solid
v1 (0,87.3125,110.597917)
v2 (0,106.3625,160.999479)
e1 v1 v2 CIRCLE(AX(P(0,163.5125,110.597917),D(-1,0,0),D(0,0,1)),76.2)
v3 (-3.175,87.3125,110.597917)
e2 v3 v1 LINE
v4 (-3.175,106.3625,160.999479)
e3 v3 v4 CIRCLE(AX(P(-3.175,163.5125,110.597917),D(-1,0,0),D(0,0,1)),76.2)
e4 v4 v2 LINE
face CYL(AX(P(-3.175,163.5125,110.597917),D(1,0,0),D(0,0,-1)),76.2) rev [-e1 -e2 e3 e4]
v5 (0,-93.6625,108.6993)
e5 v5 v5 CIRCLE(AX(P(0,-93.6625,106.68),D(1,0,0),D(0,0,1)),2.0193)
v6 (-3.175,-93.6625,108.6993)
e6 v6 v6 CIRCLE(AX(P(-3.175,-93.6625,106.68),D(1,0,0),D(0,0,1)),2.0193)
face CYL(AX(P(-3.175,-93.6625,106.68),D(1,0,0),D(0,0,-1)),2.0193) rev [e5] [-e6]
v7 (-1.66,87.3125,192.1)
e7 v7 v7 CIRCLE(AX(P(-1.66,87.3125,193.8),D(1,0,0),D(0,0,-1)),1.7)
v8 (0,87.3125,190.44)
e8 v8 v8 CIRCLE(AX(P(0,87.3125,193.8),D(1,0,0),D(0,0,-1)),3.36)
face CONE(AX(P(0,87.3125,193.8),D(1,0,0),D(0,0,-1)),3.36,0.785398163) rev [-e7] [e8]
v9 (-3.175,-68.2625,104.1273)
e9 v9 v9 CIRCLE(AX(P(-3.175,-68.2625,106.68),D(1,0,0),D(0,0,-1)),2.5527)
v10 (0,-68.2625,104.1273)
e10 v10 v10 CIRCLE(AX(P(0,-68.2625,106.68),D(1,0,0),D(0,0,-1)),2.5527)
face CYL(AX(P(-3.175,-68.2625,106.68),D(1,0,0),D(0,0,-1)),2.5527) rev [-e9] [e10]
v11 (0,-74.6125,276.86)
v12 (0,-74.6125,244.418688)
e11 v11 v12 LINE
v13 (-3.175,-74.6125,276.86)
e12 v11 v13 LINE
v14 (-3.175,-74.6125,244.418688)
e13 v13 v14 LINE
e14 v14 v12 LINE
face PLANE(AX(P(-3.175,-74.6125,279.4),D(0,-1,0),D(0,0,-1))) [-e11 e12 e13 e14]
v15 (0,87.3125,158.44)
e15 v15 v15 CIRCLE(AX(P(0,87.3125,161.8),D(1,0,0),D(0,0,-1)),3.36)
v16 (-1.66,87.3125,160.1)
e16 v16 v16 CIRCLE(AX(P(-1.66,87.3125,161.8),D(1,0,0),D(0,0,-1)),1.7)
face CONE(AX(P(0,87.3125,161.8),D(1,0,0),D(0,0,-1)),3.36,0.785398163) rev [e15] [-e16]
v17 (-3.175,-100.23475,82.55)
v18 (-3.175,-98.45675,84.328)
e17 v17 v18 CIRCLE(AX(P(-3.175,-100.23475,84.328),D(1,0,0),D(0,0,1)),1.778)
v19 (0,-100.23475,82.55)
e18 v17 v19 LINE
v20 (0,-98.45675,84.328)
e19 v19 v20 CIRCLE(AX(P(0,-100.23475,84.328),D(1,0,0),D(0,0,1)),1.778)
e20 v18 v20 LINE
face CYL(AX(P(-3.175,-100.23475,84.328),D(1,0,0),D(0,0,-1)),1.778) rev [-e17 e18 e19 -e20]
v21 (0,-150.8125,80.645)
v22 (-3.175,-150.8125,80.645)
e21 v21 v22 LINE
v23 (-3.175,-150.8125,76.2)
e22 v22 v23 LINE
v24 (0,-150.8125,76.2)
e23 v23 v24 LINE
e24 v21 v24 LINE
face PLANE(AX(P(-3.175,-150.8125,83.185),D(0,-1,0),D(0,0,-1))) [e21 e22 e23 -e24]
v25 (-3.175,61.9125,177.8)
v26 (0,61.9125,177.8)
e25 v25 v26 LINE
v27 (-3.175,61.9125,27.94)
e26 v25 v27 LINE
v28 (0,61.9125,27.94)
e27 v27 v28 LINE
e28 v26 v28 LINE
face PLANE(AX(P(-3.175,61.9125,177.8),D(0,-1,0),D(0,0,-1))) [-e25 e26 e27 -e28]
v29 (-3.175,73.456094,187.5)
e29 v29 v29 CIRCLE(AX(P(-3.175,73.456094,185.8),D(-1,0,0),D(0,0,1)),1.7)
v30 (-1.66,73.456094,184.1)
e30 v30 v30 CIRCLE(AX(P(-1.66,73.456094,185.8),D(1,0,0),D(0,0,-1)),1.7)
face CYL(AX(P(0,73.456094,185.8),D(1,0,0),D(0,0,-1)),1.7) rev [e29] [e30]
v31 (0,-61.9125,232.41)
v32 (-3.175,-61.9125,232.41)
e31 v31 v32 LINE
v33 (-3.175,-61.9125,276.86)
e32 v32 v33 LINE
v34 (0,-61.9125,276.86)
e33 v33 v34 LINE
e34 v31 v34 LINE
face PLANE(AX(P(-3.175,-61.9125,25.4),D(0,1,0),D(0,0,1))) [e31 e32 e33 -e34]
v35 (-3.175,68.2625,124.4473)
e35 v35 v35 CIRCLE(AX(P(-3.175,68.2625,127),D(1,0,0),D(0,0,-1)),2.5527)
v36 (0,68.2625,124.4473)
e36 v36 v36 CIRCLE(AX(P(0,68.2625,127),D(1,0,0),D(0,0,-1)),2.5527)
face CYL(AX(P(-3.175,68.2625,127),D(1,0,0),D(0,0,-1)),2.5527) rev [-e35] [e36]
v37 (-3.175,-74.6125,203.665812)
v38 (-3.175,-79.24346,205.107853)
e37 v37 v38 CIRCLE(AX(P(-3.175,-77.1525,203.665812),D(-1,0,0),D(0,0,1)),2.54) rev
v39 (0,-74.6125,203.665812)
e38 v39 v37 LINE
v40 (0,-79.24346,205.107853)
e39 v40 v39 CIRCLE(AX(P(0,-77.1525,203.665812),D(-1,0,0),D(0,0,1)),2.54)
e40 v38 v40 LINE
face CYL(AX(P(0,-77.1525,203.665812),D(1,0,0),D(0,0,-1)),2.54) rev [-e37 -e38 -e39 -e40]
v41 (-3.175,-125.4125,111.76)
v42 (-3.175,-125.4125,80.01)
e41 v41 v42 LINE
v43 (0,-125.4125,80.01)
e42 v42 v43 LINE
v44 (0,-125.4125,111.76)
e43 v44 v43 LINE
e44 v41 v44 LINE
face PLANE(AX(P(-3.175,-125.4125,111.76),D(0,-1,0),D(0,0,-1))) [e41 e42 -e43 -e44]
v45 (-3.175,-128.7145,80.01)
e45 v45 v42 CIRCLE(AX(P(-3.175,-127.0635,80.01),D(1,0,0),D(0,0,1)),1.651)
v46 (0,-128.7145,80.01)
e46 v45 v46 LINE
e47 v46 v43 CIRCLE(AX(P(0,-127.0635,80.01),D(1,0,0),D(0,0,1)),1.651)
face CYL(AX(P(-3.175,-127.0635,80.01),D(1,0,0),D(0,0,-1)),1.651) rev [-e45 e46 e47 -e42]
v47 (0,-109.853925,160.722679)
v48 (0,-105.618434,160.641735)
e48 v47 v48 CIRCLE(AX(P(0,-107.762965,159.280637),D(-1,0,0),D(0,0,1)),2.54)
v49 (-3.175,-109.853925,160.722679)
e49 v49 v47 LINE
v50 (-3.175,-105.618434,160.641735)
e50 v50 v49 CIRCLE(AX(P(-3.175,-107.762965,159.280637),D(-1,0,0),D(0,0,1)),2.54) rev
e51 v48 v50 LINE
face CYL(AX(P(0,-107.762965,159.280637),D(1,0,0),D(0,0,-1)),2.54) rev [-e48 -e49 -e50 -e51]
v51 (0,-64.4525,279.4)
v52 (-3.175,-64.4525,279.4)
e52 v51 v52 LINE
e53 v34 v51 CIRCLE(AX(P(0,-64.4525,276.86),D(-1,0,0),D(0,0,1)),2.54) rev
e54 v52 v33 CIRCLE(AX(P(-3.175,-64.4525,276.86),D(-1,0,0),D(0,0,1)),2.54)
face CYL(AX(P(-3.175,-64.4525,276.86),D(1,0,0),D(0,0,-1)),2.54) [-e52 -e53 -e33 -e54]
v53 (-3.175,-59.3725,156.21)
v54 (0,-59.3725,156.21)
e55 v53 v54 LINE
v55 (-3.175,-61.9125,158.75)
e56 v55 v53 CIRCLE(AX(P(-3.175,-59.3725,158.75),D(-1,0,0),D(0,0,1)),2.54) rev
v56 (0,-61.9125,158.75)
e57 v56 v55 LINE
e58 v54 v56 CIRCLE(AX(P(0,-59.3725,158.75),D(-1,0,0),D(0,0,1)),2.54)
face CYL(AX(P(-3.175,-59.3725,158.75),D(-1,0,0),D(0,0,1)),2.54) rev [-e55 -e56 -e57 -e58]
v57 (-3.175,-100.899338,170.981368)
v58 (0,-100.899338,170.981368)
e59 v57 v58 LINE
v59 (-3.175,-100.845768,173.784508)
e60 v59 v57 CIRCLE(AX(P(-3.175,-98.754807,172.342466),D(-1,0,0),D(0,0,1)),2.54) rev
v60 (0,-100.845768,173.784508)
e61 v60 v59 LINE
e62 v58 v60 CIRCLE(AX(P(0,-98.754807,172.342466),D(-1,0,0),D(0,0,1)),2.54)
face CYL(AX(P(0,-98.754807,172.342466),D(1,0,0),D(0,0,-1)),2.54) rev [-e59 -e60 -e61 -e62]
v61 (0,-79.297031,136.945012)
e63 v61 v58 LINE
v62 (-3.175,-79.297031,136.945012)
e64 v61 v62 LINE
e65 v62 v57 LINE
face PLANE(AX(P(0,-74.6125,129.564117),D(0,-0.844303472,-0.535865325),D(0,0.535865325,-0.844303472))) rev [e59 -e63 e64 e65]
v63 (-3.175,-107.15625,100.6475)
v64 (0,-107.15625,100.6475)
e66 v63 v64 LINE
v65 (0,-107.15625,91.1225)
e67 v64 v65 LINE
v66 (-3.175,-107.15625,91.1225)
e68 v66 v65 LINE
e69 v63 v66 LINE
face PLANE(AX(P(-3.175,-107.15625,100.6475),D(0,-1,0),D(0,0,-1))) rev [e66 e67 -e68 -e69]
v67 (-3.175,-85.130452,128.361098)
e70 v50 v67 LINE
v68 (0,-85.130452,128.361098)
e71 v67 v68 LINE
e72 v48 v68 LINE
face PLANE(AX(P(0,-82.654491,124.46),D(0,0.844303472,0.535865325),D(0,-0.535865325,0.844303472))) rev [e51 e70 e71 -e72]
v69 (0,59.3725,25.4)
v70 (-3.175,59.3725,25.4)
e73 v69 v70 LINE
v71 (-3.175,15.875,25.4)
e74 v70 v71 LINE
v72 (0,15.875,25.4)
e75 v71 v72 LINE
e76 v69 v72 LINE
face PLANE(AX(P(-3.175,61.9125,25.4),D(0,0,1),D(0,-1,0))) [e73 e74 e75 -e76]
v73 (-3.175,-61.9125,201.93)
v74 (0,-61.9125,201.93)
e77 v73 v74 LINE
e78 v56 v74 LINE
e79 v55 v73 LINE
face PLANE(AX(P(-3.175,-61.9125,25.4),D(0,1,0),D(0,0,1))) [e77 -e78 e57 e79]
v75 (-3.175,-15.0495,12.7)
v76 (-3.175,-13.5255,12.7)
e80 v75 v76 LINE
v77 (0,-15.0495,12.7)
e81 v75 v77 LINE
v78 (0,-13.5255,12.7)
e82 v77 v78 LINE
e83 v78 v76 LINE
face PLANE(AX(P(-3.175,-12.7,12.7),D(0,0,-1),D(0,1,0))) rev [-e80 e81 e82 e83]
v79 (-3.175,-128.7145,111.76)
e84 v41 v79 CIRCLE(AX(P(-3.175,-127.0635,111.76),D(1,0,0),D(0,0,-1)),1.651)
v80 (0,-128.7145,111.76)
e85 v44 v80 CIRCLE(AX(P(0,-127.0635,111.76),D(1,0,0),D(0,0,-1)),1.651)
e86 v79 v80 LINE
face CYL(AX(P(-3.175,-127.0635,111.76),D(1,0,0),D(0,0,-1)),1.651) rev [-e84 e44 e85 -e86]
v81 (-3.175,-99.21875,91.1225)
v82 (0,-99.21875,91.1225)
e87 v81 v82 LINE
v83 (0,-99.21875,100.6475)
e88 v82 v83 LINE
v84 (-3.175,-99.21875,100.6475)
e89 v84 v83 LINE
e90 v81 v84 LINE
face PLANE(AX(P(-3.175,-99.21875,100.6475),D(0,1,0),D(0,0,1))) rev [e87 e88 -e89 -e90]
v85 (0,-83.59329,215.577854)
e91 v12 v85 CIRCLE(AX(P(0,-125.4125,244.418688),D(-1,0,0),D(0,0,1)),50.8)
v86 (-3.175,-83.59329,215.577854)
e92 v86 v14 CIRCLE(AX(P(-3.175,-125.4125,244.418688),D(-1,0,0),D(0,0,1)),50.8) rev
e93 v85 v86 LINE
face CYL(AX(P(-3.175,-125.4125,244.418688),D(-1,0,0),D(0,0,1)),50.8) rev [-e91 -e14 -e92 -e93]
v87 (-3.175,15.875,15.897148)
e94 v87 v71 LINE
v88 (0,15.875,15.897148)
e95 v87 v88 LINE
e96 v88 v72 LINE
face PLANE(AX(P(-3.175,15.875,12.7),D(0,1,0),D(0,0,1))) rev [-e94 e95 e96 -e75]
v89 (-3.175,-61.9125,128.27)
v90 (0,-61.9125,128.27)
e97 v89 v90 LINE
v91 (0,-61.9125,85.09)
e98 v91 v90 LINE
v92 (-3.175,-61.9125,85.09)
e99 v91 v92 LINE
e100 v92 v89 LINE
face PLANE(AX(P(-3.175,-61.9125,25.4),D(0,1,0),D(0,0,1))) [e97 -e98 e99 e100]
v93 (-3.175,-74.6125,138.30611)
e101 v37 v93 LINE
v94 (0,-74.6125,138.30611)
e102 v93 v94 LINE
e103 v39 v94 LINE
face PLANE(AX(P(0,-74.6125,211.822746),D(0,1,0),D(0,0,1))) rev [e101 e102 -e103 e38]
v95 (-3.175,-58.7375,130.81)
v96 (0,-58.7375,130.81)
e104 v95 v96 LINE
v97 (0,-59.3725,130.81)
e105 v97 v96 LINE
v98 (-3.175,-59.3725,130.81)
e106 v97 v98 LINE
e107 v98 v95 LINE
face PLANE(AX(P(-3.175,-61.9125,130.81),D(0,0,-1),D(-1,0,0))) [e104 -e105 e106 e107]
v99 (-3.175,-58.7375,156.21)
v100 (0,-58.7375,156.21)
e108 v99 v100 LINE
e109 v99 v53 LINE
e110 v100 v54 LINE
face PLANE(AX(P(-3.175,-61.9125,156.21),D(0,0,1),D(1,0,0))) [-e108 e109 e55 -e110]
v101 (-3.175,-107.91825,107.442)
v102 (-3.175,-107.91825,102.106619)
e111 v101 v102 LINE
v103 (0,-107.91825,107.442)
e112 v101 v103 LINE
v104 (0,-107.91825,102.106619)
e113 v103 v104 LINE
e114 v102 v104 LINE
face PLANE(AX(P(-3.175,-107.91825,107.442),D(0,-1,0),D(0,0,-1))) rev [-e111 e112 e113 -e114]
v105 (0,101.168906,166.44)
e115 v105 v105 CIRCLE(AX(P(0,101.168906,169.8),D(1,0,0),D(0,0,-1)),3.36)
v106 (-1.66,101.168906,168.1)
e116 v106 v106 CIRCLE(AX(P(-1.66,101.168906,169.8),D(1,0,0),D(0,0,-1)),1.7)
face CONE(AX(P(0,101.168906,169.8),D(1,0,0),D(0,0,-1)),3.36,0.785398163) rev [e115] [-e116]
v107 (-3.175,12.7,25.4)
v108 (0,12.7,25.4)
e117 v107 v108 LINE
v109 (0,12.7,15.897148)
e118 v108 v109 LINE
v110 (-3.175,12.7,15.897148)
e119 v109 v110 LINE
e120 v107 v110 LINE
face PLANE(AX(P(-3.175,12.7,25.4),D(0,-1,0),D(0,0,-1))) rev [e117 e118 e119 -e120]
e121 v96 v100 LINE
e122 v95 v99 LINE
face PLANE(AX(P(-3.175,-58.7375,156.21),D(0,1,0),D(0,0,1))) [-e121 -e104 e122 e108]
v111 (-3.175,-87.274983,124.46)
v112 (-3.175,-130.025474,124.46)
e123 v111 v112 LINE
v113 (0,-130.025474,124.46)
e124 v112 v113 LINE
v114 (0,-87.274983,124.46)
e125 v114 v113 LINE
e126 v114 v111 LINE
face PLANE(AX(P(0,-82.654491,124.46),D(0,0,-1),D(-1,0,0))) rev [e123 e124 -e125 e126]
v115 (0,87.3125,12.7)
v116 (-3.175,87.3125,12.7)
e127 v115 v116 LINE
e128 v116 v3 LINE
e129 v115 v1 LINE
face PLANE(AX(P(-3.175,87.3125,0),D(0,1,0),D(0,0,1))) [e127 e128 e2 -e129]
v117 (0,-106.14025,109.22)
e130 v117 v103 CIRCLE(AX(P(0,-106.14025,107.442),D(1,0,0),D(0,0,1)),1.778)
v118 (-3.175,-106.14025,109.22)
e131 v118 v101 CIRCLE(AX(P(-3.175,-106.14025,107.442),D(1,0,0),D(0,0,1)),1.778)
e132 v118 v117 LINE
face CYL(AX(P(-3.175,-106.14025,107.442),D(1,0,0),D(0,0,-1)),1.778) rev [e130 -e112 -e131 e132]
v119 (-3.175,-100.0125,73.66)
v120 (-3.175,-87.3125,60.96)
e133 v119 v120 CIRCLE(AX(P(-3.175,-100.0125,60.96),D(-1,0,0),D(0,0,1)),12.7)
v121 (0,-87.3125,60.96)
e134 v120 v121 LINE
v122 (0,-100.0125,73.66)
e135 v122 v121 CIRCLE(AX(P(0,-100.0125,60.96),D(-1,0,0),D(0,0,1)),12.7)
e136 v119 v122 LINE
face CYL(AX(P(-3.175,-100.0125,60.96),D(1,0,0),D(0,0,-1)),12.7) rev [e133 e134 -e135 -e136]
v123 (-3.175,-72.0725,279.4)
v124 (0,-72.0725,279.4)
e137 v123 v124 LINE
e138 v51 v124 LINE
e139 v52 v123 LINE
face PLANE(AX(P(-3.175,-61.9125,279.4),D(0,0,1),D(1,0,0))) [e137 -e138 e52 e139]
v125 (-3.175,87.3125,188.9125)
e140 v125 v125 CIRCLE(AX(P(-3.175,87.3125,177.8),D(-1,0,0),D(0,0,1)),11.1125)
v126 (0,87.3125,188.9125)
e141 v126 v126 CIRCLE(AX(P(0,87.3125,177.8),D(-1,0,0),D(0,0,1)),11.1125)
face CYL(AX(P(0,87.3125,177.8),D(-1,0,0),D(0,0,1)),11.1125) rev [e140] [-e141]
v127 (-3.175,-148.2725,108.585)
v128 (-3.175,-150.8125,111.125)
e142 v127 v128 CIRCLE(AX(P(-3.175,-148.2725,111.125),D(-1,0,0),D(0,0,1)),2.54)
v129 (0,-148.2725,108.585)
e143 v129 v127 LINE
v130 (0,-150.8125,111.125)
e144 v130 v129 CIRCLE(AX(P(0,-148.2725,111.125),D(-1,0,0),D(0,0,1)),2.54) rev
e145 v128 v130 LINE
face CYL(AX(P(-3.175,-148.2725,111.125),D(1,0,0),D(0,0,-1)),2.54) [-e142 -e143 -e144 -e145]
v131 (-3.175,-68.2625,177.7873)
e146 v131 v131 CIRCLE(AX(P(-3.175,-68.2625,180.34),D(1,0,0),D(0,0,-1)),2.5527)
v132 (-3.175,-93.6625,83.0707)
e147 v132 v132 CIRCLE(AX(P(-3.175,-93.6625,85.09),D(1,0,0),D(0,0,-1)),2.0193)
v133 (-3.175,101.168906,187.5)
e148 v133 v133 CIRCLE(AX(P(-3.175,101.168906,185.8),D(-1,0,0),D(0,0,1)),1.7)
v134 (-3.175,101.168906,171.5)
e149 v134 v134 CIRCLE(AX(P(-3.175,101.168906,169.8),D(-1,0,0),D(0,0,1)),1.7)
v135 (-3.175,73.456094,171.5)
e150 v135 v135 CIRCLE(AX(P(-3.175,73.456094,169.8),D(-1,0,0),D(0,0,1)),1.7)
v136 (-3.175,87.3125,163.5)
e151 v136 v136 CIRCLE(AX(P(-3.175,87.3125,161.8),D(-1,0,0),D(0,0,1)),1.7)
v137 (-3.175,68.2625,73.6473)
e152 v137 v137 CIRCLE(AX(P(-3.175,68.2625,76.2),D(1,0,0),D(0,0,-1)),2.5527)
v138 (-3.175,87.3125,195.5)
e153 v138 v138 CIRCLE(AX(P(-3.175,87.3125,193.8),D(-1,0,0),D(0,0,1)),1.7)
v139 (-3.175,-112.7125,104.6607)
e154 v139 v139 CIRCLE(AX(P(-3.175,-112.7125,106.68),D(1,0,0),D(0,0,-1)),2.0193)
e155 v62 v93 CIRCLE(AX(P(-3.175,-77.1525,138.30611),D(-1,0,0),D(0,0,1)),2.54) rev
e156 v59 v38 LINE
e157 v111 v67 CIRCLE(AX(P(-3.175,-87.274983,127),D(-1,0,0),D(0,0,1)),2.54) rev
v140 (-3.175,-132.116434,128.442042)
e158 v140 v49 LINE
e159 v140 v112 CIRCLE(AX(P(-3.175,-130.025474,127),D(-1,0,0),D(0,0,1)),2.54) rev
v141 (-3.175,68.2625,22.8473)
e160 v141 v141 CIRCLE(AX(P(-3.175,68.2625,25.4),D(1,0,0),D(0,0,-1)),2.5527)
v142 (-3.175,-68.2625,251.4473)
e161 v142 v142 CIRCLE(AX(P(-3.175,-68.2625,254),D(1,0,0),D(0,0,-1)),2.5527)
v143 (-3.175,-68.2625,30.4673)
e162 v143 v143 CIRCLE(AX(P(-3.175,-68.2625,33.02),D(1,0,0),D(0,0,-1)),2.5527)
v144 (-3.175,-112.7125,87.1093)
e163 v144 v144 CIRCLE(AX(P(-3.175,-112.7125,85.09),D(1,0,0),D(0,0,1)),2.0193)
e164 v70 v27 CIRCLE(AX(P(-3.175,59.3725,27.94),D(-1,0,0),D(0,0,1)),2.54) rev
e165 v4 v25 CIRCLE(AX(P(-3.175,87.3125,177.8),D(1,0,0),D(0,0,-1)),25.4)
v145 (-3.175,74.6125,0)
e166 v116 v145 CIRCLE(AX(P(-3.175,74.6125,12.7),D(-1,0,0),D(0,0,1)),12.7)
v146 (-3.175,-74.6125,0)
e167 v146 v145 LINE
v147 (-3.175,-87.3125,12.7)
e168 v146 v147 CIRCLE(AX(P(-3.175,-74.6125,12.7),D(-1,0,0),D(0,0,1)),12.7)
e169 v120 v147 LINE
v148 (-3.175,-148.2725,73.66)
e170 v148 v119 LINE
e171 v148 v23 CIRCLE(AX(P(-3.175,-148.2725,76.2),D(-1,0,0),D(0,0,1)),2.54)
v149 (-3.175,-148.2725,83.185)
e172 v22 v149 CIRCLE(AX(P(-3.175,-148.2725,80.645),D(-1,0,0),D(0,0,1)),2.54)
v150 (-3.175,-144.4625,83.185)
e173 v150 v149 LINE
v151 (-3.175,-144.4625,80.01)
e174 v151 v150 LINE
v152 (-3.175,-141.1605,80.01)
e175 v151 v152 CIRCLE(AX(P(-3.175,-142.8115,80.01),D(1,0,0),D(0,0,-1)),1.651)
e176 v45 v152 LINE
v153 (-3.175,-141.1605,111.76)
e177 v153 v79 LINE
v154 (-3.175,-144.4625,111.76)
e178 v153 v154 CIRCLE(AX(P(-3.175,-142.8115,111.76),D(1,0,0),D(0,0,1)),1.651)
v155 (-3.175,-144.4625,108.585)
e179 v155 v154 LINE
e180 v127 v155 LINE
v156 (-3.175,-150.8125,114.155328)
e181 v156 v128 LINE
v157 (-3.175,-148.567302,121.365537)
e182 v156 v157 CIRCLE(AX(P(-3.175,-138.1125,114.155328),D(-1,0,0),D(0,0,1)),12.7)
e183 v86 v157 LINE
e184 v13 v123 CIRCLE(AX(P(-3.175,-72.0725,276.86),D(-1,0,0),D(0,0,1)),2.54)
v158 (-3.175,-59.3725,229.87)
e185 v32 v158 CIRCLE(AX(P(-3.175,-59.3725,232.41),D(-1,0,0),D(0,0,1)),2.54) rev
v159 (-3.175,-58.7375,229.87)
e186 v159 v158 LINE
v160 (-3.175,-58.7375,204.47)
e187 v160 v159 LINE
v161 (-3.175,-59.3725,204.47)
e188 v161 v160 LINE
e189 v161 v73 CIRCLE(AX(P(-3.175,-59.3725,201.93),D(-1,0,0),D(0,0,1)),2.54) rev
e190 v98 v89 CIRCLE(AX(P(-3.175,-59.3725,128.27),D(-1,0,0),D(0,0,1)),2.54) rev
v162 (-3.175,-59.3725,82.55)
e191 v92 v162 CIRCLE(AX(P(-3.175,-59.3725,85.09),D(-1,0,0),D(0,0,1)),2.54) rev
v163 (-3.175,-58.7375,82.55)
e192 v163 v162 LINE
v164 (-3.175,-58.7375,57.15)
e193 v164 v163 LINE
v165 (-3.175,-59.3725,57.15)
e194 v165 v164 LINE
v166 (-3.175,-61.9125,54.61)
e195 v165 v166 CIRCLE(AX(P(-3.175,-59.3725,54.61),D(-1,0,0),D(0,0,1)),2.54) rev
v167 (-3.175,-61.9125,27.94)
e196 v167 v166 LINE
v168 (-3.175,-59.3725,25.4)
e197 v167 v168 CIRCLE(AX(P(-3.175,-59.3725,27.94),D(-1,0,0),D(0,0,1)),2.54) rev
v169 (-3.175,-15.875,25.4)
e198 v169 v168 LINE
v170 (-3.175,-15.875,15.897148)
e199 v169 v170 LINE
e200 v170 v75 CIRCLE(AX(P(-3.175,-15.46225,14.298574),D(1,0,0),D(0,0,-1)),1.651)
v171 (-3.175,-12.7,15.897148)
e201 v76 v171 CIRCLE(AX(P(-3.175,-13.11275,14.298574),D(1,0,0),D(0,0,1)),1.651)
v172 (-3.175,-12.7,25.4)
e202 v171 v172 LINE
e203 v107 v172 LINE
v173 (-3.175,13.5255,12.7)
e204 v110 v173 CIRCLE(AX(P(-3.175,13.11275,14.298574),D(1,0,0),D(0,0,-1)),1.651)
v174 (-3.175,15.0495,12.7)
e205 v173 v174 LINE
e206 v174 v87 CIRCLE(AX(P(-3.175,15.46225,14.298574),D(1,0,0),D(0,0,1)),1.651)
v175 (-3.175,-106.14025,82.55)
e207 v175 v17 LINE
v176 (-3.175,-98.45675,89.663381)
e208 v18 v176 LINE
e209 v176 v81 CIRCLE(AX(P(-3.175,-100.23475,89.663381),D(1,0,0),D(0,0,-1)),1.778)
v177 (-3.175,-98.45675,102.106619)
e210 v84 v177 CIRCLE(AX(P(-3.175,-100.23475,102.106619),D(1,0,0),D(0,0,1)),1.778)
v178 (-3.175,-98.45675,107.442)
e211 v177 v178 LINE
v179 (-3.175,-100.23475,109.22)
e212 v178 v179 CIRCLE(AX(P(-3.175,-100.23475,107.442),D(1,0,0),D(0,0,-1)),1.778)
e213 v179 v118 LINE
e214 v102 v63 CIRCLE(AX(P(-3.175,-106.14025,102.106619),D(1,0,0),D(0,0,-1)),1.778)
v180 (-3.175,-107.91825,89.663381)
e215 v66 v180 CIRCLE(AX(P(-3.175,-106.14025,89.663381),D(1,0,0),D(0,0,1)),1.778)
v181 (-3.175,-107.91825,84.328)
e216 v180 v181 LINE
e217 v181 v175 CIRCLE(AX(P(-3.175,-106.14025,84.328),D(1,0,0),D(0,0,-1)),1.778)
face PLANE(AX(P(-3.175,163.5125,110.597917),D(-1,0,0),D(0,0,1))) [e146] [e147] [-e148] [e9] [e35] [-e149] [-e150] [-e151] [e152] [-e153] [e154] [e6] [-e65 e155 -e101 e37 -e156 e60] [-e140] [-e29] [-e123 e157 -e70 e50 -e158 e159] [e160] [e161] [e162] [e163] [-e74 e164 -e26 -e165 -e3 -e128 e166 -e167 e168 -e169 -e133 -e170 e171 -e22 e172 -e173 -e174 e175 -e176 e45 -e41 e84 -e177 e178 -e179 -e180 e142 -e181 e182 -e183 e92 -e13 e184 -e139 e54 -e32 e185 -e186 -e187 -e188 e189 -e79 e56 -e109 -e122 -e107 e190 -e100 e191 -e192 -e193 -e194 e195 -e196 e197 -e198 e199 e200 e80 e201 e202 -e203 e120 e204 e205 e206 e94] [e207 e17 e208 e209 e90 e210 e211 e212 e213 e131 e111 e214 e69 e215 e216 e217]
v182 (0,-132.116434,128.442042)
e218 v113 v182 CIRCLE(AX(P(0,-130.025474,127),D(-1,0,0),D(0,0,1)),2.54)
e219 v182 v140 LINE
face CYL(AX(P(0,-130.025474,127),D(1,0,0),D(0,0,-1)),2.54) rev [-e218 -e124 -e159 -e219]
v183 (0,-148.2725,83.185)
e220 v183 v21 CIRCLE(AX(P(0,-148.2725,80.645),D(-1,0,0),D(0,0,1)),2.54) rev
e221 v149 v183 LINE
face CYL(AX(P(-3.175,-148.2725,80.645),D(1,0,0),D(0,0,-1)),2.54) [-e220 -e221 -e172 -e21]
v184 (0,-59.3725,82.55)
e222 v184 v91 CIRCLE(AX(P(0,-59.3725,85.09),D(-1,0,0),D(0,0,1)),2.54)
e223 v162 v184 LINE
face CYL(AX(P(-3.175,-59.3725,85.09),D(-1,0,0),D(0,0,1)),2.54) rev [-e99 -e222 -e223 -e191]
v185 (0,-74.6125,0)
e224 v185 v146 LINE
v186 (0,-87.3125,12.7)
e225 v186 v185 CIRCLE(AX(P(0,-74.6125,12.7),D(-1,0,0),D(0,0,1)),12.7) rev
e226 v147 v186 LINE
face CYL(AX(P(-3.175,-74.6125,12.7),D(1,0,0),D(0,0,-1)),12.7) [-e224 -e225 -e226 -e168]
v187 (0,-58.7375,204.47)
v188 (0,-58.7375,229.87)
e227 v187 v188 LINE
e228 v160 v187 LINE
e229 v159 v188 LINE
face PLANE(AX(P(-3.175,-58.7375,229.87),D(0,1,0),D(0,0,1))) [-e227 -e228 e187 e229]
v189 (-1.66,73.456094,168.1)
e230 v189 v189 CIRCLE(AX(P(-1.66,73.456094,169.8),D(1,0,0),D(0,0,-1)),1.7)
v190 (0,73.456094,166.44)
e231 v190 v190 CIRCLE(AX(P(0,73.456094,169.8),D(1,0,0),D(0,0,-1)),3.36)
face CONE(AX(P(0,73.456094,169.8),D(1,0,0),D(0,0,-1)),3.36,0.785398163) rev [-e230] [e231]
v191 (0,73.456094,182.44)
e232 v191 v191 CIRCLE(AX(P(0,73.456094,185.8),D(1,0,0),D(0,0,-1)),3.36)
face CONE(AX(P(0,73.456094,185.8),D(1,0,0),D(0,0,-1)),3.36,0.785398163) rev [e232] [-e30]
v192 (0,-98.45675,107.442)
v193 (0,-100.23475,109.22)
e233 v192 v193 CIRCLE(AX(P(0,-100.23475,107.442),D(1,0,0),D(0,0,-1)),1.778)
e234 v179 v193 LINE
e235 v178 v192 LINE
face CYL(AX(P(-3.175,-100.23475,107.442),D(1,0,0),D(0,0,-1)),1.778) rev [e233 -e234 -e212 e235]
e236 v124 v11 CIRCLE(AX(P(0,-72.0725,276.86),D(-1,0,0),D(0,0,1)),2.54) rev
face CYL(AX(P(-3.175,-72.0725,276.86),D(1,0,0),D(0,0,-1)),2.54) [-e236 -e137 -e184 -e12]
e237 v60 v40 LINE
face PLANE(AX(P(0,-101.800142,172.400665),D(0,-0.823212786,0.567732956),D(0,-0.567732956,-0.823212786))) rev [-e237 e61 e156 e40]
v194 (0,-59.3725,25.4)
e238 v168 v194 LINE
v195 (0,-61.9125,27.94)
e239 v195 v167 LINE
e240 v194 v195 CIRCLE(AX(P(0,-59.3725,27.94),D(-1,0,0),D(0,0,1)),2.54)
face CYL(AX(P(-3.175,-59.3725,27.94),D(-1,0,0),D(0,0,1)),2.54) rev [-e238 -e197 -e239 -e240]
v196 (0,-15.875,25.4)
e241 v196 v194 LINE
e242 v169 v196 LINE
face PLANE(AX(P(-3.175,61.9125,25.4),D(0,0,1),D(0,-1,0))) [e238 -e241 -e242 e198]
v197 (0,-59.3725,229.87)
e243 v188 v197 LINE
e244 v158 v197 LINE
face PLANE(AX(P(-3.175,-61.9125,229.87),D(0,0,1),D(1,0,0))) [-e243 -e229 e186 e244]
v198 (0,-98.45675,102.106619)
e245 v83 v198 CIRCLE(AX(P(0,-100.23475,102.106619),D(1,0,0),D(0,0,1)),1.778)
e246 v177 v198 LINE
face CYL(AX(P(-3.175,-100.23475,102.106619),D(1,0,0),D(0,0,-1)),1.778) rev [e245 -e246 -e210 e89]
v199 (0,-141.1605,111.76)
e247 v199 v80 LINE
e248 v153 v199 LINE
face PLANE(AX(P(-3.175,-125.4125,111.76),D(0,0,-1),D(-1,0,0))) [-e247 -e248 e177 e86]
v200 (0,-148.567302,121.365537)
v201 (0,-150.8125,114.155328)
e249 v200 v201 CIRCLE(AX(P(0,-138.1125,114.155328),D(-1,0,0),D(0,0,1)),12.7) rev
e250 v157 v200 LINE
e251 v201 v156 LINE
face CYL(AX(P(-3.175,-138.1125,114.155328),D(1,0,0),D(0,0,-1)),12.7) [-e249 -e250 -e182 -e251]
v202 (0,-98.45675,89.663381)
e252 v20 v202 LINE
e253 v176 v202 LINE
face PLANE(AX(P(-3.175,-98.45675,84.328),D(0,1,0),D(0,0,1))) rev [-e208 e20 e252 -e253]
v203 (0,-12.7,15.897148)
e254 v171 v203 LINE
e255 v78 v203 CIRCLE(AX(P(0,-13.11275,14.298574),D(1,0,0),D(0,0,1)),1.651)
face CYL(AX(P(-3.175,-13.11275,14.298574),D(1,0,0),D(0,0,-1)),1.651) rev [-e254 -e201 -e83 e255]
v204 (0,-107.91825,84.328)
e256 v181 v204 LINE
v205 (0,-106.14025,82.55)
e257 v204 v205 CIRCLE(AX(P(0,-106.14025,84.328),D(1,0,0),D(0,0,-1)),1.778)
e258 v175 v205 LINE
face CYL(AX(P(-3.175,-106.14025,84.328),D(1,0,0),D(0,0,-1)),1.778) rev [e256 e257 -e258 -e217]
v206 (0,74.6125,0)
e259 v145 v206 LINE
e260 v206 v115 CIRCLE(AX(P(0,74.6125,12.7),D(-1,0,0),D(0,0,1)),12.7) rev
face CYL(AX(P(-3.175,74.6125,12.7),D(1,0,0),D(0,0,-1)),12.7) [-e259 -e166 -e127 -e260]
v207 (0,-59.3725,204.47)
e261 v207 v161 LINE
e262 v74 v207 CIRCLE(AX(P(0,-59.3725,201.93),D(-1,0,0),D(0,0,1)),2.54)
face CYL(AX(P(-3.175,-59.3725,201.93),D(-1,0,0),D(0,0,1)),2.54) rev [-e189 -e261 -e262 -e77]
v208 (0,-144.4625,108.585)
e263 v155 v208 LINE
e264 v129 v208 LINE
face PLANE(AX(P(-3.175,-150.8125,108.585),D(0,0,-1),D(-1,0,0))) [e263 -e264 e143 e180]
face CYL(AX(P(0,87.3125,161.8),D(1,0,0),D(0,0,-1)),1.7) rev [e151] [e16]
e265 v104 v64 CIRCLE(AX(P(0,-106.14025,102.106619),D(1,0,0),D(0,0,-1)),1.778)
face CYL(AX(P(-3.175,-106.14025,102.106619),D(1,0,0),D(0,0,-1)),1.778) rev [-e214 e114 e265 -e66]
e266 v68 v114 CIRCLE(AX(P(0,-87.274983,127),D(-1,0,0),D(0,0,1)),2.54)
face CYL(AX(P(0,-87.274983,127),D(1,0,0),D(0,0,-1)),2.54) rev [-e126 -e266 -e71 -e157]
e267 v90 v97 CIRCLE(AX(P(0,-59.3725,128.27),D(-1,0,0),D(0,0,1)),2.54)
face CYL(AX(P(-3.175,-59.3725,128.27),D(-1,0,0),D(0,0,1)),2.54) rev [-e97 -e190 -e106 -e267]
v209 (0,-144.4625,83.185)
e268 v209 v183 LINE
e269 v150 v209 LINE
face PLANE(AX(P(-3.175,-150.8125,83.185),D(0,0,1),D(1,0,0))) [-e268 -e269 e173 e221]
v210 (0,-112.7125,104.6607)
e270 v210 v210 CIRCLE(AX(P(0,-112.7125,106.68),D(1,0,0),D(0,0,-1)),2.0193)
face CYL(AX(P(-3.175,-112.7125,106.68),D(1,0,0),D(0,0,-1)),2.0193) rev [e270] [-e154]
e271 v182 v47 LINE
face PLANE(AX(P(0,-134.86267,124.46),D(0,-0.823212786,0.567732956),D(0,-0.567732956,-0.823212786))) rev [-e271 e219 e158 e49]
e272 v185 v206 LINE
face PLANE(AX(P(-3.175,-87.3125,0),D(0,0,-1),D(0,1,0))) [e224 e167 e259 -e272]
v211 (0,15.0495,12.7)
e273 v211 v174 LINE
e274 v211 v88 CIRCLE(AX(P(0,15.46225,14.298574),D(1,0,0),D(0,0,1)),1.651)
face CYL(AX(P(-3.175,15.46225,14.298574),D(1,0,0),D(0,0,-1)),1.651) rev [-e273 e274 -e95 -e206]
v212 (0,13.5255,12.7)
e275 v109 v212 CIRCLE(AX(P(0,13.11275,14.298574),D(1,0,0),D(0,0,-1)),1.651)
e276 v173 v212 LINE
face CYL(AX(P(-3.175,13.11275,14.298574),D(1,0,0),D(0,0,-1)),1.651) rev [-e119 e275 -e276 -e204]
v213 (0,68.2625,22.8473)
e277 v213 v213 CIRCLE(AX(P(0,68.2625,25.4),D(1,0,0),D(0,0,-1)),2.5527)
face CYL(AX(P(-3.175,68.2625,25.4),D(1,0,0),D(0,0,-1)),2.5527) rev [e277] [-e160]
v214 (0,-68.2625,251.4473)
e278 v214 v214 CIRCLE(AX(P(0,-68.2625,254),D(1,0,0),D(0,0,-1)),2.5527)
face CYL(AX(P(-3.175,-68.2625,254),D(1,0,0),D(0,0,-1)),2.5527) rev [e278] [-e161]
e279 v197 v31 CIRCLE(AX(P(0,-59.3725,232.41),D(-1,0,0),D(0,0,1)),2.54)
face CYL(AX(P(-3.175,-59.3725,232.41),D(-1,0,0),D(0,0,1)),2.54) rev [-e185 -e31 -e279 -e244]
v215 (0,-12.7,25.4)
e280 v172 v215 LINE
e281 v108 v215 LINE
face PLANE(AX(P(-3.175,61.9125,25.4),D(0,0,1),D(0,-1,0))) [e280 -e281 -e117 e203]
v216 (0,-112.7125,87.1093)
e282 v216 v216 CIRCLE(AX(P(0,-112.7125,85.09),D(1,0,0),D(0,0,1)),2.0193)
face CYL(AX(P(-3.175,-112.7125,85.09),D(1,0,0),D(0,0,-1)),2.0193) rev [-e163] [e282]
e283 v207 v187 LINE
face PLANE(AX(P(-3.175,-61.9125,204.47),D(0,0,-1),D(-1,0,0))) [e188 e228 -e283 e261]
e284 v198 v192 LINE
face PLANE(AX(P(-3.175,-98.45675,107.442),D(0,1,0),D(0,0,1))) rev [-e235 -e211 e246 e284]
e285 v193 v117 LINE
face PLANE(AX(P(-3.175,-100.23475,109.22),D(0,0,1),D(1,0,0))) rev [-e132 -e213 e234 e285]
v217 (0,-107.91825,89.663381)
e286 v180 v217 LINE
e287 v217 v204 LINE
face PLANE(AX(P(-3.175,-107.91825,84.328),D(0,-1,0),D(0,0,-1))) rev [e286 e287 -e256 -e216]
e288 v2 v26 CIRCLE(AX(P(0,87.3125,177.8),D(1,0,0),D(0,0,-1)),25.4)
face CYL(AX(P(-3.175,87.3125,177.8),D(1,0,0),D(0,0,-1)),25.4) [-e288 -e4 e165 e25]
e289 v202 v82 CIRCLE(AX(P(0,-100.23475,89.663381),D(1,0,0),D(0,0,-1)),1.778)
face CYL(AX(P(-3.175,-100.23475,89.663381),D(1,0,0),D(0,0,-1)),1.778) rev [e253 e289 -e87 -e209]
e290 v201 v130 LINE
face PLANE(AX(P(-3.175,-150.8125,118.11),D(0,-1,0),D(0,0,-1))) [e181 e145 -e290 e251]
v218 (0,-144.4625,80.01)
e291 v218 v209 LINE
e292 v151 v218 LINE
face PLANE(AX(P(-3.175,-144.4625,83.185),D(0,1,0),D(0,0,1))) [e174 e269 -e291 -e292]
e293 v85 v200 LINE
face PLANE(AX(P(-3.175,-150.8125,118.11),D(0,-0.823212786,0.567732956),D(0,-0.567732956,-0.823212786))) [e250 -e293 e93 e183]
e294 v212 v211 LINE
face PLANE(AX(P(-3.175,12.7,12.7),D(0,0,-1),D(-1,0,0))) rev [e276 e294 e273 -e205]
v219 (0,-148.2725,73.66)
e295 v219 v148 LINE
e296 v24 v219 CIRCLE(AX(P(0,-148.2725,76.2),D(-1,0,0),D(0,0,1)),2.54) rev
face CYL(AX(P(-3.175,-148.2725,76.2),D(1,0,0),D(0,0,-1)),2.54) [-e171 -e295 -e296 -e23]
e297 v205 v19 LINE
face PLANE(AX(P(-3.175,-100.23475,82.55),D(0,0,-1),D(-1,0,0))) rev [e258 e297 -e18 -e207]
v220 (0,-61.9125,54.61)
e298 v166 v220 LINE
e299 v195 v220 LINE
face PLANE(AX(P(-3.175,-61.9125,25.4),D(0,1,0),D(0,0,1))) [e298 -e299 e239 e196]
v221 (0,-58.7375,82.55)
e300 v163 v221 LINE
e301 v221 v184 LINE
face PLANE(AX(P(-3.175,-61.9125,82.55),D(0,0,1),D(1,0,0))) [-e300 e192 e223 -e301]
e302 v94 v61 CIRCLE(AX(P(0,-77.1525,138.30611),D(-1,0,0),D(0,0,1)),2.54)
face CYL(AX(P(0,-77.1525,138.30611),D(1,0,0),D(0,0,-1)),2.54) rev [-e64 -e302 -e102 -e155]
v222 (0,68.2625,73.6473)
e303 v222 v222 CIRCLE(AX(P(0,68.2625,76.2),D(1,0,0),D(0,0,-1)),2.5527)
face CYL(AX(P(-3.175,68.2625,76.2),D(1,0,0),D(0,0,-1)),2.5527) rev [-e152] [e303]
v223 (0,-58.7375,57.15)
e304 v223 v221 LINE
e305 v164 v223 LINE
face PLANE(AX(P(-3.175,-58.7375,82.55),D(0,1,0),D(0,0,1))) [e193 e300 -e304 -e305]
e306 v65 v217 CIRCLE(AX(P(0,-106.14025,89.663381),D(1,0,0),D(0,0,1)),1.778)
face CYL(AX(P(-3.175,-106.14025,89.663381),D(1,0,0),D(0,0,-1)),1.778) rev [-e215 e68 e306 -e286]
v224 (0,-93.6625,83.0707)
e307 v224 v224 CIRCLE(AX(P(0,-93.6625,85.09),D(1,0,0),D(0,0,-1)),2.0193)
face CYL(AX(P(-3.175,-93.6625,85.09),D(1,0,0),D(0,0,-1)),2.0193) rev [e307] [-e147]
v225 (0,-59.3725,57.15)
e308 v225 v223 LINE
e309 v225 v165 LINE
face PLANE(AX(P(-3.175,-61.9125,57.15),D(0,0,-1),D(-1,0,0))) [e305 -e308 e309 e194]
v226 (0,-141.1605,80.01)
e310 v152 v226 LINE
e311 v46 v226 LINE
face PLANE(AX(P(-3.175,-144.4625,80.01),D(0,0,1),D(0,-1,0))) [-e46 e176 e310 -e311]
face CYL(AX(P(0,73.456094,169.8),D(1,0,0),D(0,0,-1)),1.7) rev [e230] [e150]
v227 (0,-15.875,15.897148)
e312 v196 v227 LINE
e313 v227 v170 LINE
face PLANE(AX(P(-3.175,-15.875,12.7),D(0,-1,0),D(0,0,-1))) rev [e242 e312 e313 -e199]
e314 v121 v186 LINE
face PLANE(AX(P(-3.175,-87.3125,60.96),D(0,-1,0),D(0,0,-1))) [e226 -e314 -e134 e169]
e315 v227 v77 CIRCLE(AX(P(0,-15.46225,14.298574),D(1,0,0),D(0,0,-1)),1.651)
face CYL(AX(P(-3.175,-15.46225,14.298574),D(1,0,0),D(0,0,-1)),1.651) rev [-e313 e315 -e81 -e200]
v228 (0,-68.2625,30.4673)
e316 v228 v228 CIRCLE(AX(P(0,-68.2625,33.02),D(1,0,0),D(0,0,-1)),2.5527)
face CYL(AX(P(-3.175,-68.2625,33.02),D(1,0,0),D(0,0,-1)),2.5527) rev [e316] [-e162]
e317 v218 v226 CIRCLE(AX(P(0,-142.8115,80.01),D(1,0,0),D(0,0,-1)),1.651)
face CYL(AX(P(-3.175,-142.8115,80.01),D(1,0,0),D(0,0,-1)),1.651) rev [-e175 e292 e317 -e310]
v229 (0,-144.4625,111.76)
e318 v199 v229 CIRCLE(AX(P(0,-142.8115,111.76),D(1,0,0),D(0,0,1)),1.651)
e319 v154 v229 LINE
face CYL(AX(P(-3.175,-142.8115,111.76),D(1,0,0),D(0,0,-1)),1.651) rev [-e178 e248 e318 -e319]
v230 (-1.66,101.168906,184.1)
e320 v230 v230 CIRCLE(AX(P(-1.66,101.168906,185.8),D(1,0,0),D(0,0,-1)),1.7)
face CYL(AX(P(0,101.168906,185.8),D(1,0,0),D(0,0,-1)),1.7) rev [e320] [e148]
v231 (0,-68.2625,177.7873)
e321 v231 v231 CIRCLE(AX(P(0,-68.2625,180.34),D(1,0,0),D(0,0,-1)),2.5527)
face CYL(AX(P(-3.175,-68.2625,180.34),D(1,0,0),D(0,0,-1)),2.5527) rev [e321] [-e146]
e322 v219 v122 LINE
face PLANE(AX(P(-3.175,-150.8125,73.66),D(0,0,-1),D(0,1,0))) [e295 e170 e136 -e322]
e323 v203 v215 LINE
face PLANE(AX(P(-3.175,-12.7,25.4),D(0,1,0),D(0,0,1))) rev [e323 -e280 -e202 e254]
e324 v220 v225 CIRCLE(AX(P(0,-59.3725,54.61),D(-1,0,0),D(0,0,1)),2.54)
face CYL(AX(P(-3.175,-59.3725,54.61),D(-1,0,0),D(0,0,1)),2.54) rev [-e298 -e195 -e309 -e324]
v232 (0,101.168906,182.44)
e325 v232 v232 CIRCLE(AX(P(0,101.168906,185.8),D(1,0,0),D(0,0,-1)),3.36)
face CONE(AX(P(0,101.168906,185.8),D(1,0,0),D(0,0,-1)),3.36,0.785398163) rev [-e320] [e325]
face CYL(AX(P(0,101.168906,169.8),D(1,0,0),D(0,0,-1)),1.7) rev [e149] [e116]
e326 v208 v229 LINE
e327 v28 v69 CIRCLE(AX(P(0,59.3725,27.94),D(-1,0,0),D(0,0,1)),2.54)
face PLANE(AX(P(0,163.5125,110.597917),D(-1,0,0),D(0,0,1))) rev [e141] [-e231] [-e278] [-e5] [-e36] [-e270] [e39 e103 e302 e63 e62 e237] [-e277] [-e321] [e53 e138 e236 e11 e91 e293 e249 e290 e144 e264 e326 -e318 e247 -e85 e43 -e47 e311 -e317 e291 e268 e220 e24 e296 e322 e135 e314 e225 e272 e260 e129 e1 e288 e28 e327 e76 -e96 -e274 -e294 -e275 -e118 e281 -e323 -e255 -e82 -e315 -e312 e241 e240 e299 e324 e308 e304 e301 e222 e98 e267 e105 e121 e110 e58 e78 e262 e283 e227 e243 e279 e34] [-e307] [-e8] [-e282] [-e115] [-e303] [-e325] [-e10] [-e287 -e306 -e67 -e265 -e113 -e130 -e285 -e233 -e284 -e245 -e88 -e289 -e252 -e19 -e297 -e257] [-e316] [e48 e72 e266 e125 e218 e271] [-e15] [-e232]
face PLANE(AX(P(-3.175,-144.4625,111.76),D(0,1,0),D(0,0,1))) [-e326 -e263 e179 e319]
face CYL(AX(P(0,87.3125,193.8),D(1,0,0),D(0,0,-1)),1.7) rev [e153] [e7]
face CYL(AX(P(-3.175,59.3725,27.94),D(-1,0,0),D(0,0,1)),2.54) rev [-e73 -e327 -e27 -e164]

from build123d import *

# Parameters (mm, degrees)
BASE_FLANGE1_DEPTH           = 3.175
SKETCH8_W                    = 12.7
SKETCH8_H                    = 3.175
CUT_EXTRUDE2_DEPTH           = 318.51984313
SKETCH11_R                   = 3.175
CUT_EXTRUDE4_DEPTH           = 318.51984313
SKETCH21_R                   = 2.5527
CUT_EXTRUDE5_DEPTH           = 318.51984313
SKETCH23_W                   = 25.4
SKETCH23_H                   = 3.175
TAB1_DEPTH                   = 3.175
CSK_FOR_M3_SFHCS1_AT_2_COUNT = 2
CSK_FOR_M3_SFHCS1_AT_2_PITCH = 16
CSK_FOR_M3_SFHCS1_AT_3_COUNT = 2
CSK_FOR_M3_SFHCS1_AT_3_PITCH = 27.712812921
CSK_FOR_M3_SFHCS1_AT_4_COUNT = 2
CSK_FOR_M3_SFHCS1_AT_4_PITCH = 32
CSK_FOR_M3_SFHCS1_AT_5_COUNT = 2
CSK_FOR_M3_SFHCS1_AT_5_PITCH = 27.712812921
CSK_FOR_M3_SFHCS1_AT_6_COUNT = 2
CSK_FOR_M3_SFHCS1_AT_6_PITCH = 16
SKETCH27_R                   = 2.0193
CUT_EXTRUDE6_DEPTH           = 318.51984313
CUT_EXTRUDE8_DEPTH           = 318.51984313
FILLET2_R                    = 12.7
SKETCH29_R                   = 11.1125
CUT_EXTRUDE9_DEPTH           = 318.51984313
BREAK_CORNER1_START          = -3.175
BREAK_CORNER1_DEPTH          = 3.175
FILLET1_R                    = 2.54
FILLET4_R                    = 50.8
CUT_EXTRUDE10_DEPTH          = 318.51984313
FILLET5_R                    = 2.54


# Read off the part's stored shape, not the designer's step: Break-Corner1
# Sheet-metal steps are written as plain solids
with BuildPart() as part:
    # Sketch1 → Base-Flange1 (new body)
    with BuildSketch(Plane(origin=(0, 0, 0), x_dir=(0, 0, -1), z_dir=(1, 0, 0))):
        with BuildLine():
            Line((0, -87.3125), (0, 87.3125))
            Line((0, 87.3125), (-110.597916699, 87.3125))
            ThreePointArc((-110.597916699, 87.3125), (-137.538685062, 92.233926782), (-160.999479175, 106.3625))
            ThreePointArc((-160.999479175, 106.3625), (-201.559524406, 96.292756121), (-177.8, 61.9125))
            Line((-177.8, 61.9125), (-25.4, 61.9125))
            Line((-25.4, 61.9125), (-25.4, -61.9125))
            Line((-25.4, -61.9125), (-279.4, -61.9125))
            Line((-279.4, -61.9125), (-279.4, -74.6125))
            Line((-279.4, -74.6125), (-228.6, -74.6125))
            Line((-228.6, -74.6125), (-118.11, -150.8125))
            Line((-118.11, -150.8125), (-108.585, -150.8125))
            Line((-108.585, -150.8125), (-108.585, -144.4625))
            Line((-108.585, -144.4625), (-111.76, -144.4625))
            Line((-111.76, -144.4625), (-111.76, -125.4125))
            Line((-111.76, -125.4125), (-80.01, -125.4125))
            Line((-80.01, -125.4125), (-80.01, -144.4625))
            Line((-80.01, -144.4625), (-83.185, -144.4625))
            Line((-83.185, -144.4625), (-83.185, -150.8125))
            Line((-83.185, -150.8125), (-73.66, -150.8125))
            Line((-73.66, -150.8125), (-73.66, -100.0125))
            ThreePointArc((-73.66, -100.0125), (-69.940256121, -91.032243879), (-60.96, -87.3125))
            Line((-60.96, -87.3125), (0, -87.3125))
        make_face()
    extrude(amount=-BASE_FLANGE1_DEPTH)

    # Sketch8 → Cut-Extrude2 (cut, through all)
    with BuildSketch(Plane(origin=(0, 0, 0), x_dir=(0, 0, -1), z_dir=(1, 0, 0))):
        with Locations((-19.05, 14.2875)):
            Rectangle(SKETCH8_W, SKETCH8_H)
        with Locations((-19.05, -14.2875)):
            Rectangle(SKETCH8_W, SKETCH8_H)
    extrude(amount=-CUT_EXTRUDE2_DEPTH, mode=Mode.SUBTRACT)

    # Sketch11 → Cut-Extrude4 (cut, through all)
    with BuildSketch(Plane(origin=(0, 0, 0), x_dir=(0, 0, -1), z_dir=(1, 0, 0))):
        with Locations((-177.8, 87.3125)):
            Circle(SKETCH11_R)
    extrude(amount=-CUT_EXTRUDE4_DEPTH, mode=Mode.SUBTRACT)

    # Sketch21 → Cut-Extrude5 (cut, through all)
    with BuildSketch(Plane(origin=(0, 0, 0), x_dir=(0, 0, -1), z_dir=(1, 0, 0))):
        with Locations((-33.02, -68.2625)):
            Circle(SKETCH21_R)
        with Locations((-106.68, -68.2625)):
            Circle(SKETCH21_R)
        with Locations((-180.34, -68.2625)):
            Circle(SKETCH21_R)
        with Locations((-254, -68.2625)):
            Circle(SKETCH21_R)
        with Locations((-25.4, 68.2625)):
            Circle(SKETCH21_R)
        with Locations((-76.2, 68.2625)):
            Circle(SKETCH21_R)
        with Locations((-127, 68.2625)):
            Circle(SKETCH21_R)
    extrude(amount=-CUT_EXTRUDE5_DEPTH, mode=Mode.SUBTRACT)

    # Sketch23 → Tab1 (add)
    with BuildSketch(Plane(origin=(0, 0, 0), x_dir=(0, 0, -1), z_dir=(1, 0, 0))):
        with Locations((-217.17, -60.325)):
            Rectangle(SKETCH23_W, SKETCH23_H)
        with Locations((-143.51, -60.325)):
            Rectangle(SKETCH23_W, SKETCH23_H)
        with Locations((-69.85, -60.325)):
            Rectangle(SKETCH23_W, SKETCH23_H)
    extrude(amount=-TAB1_DEPTH)

    # Sketch25 → CSK for M3 SFHCS1 (revolve, cut)
    with BuildSketch(Plane(origin=(0, 87.3125, 161.8), x_dir=(0, 0, -1), z_dir=(0, 1, 0))):
        Polygon((0, 0), (0, 3.175), (1.7, 3.175), (1.7, 1.66), (3.36, 0), align=None)
    csk_for_m3_sfhcs1 = revolve(axis=Axis((6.35, 87.3125, 161.8), (-1, 0, 0)), mode=Mode.SUBTRACT)

    # CSK for M3 SFHCS1 at 2: CSK for M3 SFHCS1 ×2
    with Locations(*[Vector(0, -0.8660254037844383, 0.5000000000000007) * (i * CSK_FOR_M3_SFHCS1_AT_2_PITCH) for i in range(1, CSK_FOR_M3_SFHCS1_AT_2_COUNT)]):
        add(csk_for_m3_sfhcs1, mode=Mode.SUBTRACT)

    # CSK for M3 SFHCS1 at 3: CSK for M3 SFHCS1 ×2
    with Locations(*[Vector(0, -0.5000000000000007, 0.8660254037844384) * (i * CSK_FOR_M3_SFHCS1_AT_3_PITCH) for i in range(1, CSK_FOR_M3_SFHCS1_AT_3_COUNT)]):
        add(csk_for_m3_sfhcs1, mode=Mode.SUBTRACT)

    # CSK for M3 SFHCS1 at 4: CSK for M3 SFHCS1 ×2
    with Locations(*[(0, 0, i * CSK_FOR_M3_SFHCS1_AT_4_PITCH) for i in range(1, CSK_FOR_M3_SFHCS1_AT_4_COUNT)]):
        add(csk_for_m3_sfhcs1, mode=Mode.SUBTRACT)

    # CSK for M3 SFHCS1 at 5: CSK for M3 SFHCS1 ×2
    with Locations(*[Vector(0, 0.500000000000001, 0.866025403784438) * (i * CSK_FOR_M3_SFHCS1_AT_5_PITCH) for i in range(1, CSK_FOR_M3_SFHCS1_AT_5_COUNT)]):
        add(csk_for_m3_sfhcs1, mode=Mode.SUBTRACT)

    # CSK for M3 SFHCS1 at 6: CSK for M3 SFHCS1 ×2
    with Locations(*[Vector(0, 0.8660254037844392, 0.49999999999999917) * (i * CSK_FOR_M3_SFHCS1_AT_6_PITCH) for i in range(1, CSK_FOR_M3_SFHCS1_AT_6_COUNT)]):
        add(csk_for_m3_sfhcs1, mode=Mode.SUBTRACT)

    # Sketch27 → Cut-Extrude6 (cut, through all)
    with BuildSketch(Plane(origin=(0, 0, 0), x_dir=(0, 0, -1), z_dir=(1, 0, 0))):
        with Locations((-85.09, -93.6625)):
            Circle(SKETCH27_R)
        with Locations(Location((-85.09, -112.7125, 0), (0, 0, 180))):
            Circle(SKETCH27_R)
        with Locations((-106.68, -112.7125)):
            Circle(SKETCH27_R)
        with Locations(Location((-106.68, -93.6625, 0), (0, 0, 180))):
            Circle(SKETCH27_R)
        with BuildLine():
            Line((-107.442, -98.45675), (-102.106618912, -98.45675))
            ThreePointArc((-102.106618912, -98.45675), (-101.283564844, -98.658721447), (-100.6475, -99.21875))
            Line((-100.6475, -99.21875), (-91.1225, -99.21875))
            ThreePointArc((-91.1225, -99.21875), (-90.486435156, -98.658721447), (-89.663381088, -98.45675))
            Line((-89.663381088, -98.45675), (-84.328, -98.45675))
            ThreePointArc((-84.328, -98.45675), (-83.070764143, -98.977514143), (-82.55, -100.23475))
            Line((-82.55, -100.23475), (-82.55, -106.14025))
            ThreePointArc((-82.55, -106.14025), (-83.070764143, -107.397485857), (-84.328, -107.91825))
            Line((-84.328, -107.91825), (-89.663381088, -107.91825))
            ThreePointArc((-89.663381088, -107.91825), (-90.486435156, -107.716278553), (-91.1225, -107.15625))
            Line((-91.1225, -107.15625), (-100.6475, -107.15625))
            ThreePointArc((-100.6475, -107.15625), (-101.283564844, -107.716278553), (-102.106618912, -107.91825))
            Line((-102.106618912, -107.91825), (-107.442, -107.91825))
            ThreePointArc((-107.442, -107.91825), (-108.699235857, -107.397485857), (-109.22, -106.14025))
            Line((-109.22, -106.14025), (-109.22, -100.23475))
            ThreePointArc((-109.22, -100.23475), (-108.699235857, -98.977514143), (-107.442, -98.45675))
        make_face()
    extrude(amount=-CUT_EXTRUDE6_DEPTH, mode=Mode.SUBTRACT)

    # Sketch28 → Cut-Extrude8 (cut, through all)
    with BuildSketch(Plane(origin=(0, 0, 0), x_dir=(0, 0, -1), z_dir=(1, 0, 0))):
        with BuildLine():
            Line((-111.76, -144.4625), (-111.76, -141.1605))
            ThreePointArc((-111.76, -141.1605), (-113.411, -142.8115), (-111.76, -144.4625))
        make_face()
        with BuildLine():
            Line((-80.01, -144.4625), (-80.01, -141.1605))
            ThreePointArc((-80.01, -141.1605), (-78.359, -142.8115), (-80.01, -144.4625))
        make_face()
        with BuildLine():
            Line((-80.01, -125.4125), (-80.01, -128.7145))
            ThreePointArc((-80.01, -128.7145), (-78.359, -127.0635), (-80.01, -125.4125))
        make_face()
        with BuildLine():
            Line((-111.76, -125.4125), (-111.76, -128.7145))
            ThreePointArc((-111.76, -128.7145), (-113.411, -127.0635), (-111.76, -125.4125))
        make_face()
        with BuildLine():
            ThreePointArc((-15.458644321, -14.2875), (-14.298573876, -17.11325), (-13.138503431, -14.2875))
            ThreePointArc((-13.138503431, -14.2875), (-14.298573876, -11.46175), (-15.458644321, -14.2875))
        make_face()
        with BuildLine():
            ThreePointArc((-15.458644321, 14.2875), (-14.298573876, 11.46175), (-13.138503431, 14.2875))
            ThreePointArc((-13.138503431, 14.2875), (-14.298573876, 17.11325), (-15.458644321, 14.2875))
        make_face()
    extrude(amount=-CUT_EXTRUDE8_DEPTH, mode=Mode.SUBTRACT)

    # Fillet2
    fillet2_edges = [part.edges().sort_by_distance(p)[0] for p in [
        (-1.5875, -87.3125, 0),
        (-1.5875, -150.8125, 118.11),
    ]]
    fillet(fillet2_edges, radius=FILLET2_R)

    # Sketch29 → Cut-Extrude9 (cut, through all)
    with BuildSketch(Plane.ZY.offset(3.175)):
        with Locations((177.8, 87.3125)):
            Circle(SKETCH29_R)
    extrude(amount=-CUT_EXTRUDE9_DEPTH, mode=Mode.SUBTRACT)

    # Break-Corner1 outline → Break-Corner1 (cut)
    with BuildSketch(Plane.YZ.offset(BREAK_CORNER1_START)):
        with BuildLine():
            ThreePointArc((87.3125, 12.7), (83.592756121, 3.719743879), (74.6125, 0))
            Line((74.6125, 0), (87.3125, 0))
            Line((87.3125, 0), (87.3125, 12.7))
        make_face()
    extrude(amount=BREAK_CORNER1_DEPTH, mode=Mode.SUBTRACT)

    # Fillet1
    fillet1_edges = [part.edges().sort_by_distance(p)[0] for p in [
        (-1.5875, -61.9125, 229.87),
        (-1.5875, -61.9125, 204.47),
        (-1.5875, -61.9125, 156.21),
        (-1.5875, -61.9125, 130.81),
        (-1.5875, -61.9125, 82.55),
        (-1.5875, -61.9125, 57.15),
        (-1.5875, -150.8125, 73.66),
        (-1.5875, -150.8125, 83.185),
        (-1.5875, -150.8125, 108.585),
        (-1.5875, -74.6125, 279.4),
        (-1.5875, -61.9125, 279.4),
        (-1.5875, -61.9125, 25.4),
        (-1.5875, 61.9125, 25.4),
    ]]
    fillet(fillet1_edges, radius=FILLET1_R)

    # Fillet4
    fillet4_edges = [part.edges().sort_by_distance(p)[0] for p in [
        (-1.5875, -74.6125, 228.6),
    ]]
    fillet(fillet4_edges, radius=FILLET4_R)

    # Sketch30 → Cut-Extrude10 (cut, through all)
    with BuildSketch(Plane.ZY.offset(3.175)):
        Polygon((124.46, -134.86266966), (163.882081016, -107.67502758), (124.46, -82.654490572), align=None)
        Polygon((211.822746006, -74.6125), (129.564117224, -74.6125), (172.400664991, -101.80014208), align=None)
    extrude(amount=-CUT_EXTRUDE10_DEPTH, mode=Mode.SUBTRACT)

    # Fillet5
    fillet5_edges = [part.edges().sort_by_distance(p)[0] for p in [
        (-1.5875, -74.6125, 211.822746006),
        (-1.5875, -101.80014208, 172.400664991),
        (-1.5875, -74.6125, 129.564117224),
        (-1.5875, -134.86266966, 124.46),
        (-1.5875, -82.654490572, 124.46),
        (-1.5875, -107.67502758, 163.882081016),
    ]]
    fillet(fillet5_edges, radius=FILLET5_R)


solid = part.part
